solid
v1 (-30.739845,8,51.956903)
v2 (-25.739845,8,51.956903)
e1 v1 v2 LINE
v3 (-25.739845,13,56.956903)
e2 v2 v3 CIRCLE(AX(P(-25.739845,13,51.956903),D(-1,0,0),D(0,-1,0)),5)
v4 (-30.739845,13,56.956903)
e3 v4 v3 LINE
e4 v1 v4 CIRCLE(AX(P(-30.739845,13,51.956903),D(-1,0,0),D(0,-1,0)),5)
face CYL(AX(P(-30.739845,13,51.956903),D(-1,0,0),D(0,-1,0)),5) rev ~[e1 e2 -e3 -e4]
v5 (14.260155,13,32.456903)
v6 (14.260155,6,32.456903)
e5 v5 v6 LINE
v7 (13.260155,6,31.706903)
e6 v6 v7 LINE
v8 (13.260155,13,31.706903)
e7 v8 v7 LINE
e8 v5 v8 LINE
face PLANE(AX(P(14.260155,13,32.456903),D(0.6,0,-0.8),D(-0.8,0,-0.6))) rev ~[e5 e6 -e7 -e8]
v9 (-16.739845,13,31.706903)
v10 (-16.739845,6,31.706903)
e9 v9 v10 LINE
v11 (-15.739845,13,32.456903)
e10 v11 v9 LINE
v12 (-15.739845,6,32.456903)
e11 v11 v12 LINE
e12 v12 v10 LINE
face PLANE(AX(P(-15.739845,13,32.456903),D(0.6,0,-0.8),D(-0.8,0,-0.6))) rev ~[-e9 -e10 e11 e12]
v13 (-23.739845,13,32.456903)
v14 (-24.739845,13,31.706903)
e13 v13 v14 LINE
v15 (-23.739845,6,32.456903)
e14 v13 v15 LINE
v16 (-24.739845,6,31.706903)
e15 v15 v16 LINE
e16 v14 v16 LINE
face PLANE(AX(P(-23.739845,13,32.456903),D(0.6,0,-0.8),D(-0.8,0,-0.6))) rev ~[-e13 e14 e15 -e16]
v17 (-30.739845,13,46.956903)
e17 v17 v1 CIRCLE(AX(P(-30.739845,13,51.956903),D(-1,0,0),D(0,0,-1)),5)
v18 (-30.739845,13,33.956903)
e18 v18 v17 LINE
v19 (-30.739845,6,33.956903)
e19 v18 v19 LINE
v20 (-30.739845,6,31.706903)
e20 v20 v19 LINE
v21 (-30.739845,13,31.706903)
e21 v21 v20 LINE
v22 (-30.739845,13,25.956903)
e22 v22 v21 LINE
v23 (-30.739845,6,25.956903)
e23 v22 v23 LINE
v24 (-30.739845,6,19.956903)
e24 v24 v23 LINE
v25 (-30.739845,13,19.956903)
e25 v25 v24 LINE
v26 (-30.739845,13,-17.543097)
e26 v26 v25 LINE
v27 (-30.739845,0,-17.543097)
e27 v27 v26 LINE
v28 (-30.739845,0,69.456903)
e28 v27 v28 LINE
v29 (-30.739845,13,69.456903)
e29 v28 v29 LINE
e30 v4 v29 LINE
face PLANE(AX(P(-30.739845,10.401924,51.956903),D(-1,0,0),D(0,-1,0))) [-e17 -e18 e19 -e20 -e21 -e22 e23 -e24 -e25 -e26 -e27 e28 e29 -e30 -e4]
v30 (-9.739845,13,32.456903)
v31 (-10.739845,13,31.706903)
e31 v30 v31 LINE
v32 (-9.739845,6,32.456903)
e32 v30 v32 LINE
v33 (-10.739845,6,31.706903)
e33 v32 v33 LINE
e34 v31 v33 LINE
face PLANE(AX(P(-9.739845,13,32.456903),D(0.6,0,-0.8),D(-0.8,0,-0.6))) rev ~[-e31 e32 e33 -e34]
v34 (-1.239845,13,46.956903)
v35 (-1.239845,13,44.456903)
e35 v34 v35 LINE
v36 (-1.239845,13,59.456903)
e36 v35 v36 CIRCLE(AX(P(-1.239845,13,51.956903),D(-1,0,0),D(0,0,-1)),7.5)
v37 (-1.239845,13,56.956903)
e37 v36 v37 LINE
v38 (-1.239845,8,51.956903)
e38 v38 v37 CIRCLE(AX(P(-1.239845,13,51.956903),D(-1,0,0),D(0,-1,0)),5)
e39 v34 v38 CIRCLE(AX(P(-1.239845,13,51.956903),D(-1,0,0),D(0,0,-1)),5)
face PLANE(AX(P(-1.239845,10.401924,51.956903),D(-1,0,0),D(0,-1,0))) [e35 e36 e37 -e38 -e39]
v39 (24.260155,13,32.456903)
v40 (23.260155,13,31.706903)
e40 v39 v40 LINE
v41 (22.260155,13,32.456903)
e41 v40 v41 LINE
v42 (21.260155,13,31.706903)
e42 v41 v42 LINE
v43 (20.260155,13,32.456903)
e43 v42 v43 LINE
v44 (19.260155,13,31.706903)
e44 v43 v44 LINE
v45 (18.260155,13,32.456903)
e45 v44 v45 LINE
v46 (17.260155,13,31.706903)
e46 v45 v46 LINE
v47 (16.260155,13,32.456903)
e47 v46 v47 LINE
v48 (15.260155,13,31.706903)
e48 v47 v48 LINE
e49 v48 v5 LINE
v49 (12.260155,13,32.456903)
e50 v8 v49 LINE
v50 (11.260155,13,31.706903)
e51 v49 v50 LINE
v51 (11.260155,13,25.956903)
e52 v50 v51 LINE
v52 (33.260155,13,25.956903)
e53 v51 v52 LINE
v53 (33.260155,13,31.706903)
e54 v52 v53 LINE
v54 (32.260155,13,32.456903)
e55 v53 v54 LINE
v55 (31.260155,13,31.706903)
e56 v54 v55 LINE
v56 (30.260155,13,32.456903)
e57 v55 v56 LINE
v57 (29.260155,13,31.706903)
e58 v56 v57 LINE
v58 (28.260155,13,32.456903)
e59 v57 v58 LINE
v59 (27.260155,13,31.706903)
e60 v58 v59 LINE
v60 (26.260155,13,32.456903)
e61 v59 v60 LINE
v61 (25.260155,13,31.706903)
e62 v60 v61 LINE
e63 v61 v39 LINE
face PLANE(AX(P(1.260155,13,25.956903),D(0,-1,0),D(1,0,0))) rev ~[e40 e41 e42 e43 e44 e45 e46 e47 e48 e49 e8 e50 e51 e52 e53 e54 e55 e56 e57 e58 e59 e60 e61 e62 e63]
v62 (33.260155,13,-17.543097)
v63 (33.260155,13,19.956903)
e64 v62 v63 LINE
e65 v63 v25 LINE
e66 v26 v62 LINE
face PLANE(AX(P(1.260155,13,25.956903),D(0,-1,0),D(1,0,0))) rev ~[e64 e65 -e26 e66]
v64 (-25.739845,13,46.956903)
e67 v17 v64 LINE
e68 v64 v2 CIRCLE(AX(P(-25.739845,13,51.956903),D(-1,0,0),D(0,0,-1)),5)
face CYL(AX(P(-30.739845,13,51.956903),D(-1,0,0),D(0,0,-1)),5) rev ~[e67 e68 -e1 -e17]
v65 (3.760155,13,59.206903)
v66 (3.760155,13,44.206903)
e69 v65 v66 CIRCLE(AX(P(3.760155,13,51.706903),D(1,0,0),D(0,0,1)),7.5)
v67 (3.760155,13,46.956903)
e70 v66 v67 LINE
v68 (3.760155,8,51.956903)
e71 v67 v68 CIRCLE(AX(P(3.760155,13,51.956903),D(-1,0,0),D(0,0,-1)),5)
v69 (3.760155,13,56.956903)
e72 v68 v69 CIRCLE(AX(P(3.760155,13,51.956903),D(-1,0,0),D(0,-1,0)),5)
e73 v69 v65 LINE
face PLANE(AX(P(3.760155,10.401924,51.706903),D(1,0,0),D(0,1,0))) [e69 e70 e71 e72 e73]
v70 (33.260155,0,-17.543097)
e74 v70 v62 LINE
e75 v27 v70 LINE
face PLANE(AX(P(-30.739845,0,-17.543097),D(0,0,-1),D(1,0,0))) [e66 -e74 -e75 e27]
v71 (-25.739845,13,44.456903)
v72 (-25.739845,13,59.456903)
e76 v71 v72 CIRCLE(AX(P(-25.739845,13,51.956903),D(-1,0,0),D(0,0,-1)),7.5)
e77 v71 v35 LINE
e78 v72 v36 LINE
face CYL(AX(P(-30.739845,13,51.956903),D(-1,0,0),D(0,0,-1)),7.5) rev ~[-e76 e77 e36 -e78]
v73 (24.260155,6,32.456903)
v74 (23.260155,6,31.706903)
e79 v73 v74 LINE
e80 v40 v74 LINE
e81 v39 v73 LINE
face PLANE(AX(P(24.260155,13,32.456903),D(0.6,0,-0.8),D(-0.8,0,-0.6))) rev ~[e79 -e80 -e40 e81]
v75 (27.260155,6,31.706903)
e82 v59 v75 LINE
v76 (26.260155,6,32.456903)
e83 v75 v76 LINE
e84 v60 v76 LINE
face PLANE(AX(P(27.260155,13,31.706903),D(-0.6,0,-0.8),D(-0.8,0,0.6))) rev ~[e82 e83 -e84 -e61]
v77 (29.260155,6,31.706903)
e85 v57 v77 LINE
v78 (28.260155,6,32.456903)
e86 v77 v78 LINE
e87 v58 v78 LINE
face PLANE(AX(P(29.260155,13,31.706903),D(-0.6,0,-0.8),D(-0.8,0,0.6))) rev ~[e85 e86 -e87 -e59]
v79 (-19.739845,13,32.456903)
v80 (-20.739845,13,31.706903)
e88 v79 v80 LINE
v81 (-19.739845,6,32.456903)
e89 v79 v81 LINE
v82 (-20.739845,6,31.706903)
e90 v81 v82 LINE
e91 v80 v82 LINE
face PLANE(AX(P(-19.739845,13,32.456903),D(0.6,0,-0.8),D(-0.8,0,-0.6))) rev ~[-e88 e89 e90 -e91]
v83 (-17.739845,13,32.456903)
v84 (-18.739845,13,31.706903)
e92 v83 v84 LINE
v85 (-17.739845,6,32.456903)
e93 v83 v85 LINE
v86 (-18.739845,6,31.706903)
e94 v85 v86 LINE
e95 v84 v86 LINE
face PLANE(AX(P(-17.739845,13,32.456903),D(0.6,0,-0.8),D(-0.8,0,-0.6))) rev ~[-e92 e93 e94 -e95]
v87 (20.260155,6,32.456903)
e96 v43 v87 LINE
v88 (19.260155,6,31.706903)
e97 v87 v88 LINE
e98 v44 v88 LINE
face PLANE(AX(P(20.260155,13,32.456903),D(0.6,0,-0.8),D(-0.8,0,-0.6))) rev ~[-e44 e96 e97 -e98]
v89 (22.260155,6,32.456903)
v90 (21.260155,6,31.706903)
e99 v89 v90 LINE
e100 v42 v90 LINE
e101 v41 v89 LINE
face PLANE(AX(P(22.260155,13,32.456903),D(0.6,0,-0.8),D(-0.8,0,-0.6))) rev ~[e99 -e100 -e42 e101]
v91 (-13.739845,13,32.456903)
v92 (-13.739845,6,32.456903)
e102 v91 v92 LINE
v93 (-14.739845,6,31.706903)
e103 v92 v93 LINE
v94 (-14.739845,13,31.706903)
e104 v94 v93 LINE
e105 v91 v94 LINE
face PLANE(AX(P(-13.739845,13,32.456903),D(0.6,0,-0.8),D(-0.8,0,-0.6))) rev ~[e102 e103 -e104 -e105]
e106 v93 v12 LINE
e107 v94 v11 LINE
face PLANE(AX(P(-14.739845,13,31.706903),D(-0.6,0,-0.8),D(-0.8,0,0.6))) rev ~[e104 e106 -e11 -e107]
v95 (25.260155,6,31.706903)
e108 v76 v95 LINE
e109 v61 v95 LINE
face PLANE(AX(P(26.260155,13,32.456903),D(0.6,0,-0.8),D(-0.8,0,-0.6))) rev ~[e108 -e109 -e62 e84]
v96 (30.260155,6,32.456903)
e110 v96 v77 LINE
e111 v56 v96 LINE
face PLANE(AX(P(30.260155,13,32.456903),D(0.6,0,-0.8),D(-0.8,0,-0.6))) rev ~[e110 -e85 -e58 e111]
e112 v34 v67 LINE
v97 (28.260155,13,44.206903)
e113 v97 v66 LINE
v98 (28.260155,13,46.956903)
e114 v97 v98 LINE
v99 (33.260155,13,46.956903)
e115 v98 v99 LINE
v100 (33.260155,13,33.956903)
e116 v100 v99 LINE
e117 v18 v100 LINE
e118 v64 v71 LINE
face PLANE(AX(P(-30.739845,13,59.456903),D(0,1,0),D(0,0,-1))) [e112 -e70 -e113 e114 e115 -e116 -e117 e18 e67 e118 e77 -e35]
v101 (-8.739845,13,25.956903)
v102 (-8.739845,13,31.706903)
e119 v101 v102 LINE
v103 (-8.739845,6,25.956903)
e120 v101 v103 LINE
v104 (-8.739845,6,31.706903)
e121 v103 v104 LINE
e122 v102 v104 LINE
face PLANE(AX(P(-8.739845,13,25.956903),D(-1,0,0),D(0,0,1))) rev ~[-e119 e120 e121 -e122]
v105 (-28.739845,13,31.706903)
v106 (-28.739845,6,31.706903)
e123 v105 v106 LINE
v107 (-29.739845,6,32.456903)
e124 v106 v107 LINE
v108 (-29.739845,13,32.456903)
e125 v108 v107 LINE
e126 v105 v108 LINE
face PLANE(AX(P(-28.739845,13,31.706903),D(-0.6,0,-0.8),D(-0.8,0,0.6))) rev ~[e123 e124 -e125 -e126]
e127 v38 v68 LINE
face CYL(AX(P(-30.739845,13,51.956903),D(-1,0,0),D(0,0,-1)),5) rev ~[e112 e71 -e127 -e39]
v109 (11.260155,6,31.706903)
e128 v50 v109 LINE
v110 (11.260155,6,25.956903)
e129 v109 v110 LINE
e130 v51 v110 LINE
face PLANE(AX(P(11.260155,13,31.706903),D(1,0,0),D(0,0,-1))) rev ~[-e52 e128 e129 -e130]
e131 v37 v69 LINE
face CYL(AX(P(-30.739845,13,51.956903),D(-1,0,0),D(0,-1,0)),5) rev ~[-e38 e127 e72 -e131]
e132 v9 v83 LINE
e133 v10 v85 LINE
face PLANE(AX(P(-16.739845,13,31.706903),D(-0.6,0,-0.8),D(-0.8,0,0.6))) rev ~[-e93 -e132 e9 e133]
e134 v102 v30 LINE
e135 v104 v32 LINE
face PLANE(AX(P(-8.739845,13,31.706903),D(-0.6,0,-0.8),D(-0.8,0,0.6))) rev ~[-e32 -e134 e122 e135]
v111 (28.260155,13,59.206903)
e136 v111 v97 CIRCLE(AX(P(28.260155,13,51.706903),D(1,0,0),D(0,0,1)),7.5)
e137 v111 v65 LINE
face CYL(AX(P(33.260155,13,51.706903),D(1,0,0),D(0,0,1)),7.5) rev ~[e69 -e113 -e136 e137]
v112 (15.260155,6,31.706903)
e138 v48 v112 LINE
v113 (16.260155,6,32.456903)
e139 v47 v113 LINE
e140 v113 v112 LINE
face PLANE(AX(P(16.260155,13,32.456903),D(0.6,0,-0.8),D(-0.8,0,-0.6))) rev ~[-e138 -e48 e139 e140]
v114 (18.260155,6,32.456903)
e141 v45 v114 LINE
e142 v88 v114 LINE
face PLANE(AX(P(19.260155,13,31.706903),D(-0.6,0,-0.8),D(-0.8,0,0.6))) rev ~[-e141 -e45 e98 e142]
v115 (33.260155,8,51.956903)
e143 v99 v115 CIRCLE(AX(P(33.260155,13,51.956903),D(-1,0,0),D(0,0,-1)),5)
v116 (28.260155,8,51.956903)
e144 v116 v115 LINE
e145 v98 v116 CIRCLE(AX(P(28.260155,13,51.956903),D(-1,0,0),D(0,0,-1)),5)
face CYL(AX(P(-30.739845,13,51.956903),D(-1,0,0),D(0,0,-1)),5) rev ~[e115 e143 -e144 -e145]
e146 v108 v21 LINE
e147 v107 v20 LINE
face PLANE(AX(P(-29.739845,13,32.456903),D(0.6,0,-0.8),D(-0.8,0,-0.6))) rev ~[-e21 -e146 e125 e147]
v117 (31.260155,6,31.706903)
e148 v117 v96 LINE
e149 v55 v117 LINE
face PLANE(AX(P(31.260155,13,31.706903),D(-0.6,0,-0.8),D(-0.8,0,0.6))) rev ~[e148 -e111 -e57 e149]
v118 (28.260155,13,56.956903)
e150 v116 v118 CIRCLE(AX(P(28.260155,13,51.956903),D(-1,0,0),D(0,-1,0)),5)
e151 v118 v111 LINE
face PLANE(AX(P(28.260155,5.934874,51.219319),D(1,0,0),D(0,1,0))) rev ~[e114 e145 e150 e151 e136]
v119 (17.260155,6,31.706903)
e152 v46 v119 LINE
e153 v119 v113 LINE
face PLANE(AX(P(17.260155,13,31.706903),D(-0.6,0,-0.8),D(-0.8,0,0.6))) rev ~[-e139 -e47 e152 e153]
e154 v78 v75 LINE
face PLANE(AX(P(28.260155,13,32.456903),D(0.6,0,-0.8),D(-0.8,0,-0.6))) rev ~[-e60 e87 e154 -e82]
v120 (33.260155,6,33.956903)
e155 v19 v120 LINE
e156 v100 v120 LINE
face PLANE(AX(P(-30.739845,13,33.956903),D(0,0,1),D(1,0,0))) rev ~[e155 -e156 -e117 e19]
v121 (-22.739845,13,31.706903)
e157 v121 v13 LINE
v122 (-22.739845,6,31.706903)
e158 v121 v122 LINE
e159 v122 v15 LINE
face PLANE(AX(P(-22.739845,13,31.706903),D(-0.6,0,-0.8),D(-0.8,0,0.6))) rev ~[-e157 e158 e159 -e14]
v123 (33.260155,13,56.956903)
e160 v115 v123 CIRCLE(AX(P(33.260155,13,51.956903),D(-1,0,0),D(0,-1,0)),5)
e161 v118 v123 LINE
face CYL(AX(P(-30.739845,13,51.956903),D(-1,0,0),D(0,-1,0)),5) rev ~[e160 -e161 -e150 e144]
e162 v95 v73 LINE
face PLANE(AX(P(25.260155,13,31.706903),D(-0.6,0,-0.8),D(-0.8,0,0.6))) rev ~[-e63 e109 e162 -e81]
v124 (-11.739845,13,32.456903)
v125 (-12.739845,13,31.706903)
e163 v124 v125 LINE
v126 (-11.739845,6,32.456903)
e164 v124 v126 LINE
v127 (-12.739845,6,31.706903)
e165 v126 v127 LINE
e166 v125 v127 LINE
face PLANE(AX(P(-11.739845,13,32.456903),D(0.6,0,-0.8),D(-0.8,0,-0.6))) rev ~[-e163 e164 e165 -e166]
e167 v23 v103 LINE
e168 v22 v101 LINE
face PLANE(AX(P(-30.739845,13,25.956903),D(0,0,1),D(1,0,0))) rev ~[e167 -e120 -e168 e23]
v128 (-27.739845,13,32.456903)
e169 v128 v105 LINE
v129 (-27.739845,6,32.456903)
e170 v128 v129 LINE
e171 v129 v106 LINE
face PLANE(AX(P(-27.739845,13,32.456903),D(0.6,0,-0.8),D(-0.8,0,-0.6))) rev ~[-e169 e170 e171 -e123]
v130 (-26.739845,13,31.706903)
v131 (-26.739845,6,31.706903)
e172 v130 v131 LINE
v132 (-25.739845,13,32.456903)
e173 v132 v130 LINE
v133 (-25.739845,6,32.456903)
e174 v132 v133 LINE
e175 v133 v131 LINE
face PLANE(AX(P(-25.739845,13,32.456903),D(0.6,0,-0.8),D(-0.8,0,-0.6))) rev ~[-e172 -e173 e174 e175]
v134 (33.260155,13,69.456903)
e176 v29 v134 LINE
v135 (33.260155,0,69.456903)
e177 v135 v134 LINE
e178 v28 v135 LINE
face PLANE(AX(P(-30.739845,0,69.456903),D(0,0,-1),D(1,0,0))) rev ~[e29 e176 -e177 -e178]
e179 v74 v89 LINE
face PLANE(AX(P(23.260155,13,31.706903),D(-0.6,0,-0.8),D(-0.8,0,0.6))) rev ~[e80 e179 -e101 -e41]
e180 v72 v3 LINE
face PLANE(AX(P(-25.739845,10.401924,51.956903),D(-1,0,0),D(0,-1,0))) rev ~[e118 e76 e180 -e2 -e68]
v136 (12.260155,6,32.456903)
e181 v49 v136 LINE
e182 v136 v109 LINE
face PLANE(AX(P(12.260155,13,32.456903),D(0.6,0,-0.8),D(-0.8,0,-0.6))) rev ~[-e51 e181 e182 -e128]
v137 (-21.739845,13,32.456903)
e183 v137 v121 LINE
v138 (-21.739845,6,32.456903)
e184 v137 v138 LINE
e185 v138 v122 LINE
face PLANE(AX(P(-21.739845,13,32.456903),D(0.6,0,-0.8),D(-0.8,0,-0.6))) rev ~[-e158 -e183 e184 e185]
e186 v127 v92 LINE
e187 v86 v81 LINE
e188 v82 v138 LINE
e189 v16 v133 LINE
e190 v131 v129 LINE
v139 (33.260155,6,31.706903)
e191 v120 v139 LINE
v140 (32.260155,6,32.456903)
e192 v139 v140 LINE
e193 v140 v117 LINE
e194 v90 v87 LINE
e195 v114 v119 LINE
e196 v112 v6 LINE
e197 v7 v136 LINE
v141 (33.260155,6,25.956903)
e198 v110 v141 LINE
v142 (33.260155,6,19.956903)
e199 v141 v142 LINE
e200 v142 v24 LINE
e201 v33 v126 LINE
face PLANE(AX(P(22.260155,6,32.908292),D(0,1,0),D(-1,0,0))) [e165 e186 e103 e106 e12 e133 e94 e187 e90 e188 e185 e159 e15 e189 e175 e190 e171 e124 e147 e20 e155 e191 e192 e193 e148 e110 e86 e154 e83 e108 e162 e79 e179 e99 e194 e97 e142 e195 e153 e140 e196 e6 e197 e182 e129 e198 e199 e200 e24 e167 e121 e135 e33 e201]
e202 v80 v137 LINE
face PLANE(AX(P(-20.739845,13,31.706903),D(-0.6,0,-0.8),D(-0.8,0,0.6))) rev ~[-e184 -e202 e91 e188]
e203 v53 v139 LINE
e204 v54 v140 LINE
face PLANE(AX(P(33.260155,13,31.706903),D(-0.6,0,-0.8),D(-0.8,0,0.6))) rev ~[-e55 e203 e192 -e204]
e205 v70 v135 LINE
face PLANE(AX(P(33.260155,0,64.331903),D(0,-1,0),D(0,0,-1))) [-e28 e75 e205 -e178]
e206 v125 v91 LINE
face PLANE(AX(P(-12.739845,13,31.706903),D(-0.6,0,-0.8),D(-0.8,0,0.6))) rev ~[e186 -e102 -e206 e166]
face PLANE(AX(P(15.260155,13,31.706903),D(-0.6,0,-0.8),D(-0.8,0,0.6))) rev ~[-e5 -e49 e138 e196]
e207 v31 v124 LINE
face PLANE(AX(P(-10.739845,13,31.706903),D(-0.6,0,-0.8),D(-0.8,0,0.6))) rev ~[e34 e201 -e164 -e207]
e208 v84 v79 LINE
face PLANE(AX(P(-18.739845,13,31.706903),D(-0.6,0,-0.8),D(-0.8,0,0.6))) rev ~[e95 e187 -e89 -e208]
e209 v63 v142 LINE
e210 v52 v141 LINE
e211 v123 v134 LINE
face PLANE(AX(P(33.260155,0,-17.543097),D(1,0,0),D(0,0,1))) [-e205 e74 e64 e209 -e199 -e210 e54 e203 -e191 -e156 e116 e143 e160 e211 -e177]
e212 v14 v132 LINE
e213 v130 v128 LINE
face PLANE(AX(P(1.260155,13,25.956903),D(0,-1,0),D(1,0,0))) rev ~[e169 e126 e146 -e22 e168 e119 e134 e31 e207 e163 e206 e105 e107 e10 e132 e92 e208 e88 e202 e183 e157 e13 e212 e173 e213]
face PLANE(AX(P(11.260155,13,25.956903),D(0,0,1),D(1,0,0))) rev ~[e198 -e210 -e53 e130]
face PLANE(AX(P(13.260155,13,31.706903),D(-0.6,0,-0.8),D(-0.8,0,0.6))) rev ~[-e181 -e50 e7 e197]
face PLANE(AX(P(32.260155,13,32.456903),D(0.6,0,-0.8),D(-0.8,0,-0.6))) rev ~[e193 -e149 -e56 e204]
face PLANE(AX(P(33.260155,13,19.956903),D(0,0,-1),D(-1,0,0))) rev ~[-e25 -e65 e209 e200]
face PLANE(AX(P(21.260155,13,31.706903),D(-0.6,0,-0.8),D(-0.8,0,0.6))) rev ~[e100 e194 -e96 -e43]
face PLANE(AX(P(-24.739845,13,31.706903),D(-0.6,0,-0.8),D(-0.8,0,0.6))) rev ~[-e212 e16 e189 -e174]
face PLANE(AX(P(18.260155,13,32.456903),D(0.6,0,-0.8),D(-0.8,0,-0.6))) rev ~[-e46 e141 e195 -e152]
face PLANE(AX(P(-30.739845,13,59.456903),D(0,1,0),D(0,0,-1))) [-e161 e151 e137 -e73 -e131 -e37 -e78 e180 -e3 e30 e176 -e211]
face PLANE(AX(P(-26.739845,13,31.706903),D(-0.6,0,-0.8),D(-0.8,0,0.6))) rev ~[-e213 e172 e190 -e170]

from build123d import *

# Parameters (mm, degrees)
F0_W      = 64
F0_H      = 87
F1_DEPTH  = 13
F3_DEPTH  = 7
F5_DEPTH  = 29.5
F7_DEPTH  = 29.5
F9_DEPTH  = 5
F10_DEPTH = 5
F12_DEPTH = 64.001


with BuildPart() as f1:
    # F0 (on Front) → F1 (new body)
    with BuildSketch(Plane.XZ):
        with Locations((1.2601554287, 25.9569030584)):
            Rectangle(F0_W, F0_H)
    extrude(amount=-F1_DEPTH)

    # F2 (on face) → F3 (cut)
    with BuildSketch(Plane(origin=(0, 13, 0), x_dir=(-1, 0, 0), z_dir=(0, 1, 0))):
        Polygon((-11.2601554287, 33.9569030584), (-33.2601554287, 33.9569030584), (-33.2601554287, 31.7069030584), (-32.2601554287, 32.4569030584), (-31.2601554287, 31.7069030584), (-30.2601554287, 32.4569030584), (-29.2601554287, 31.7069030584), (-28.2601554287, 32.4569030584), (-27.2601554287, 31.7069030584), (-26.2601554287, 32.4569030584), (-25.2601554287, 31.7069030584), (-24.2601554287, 32.4569030584), (-23.2601554287, 31.7069030584), (-22.2601554287, 32.4569030584), (-21.2601554287, 31.7069030584), (-20.2601554287, 32.4569030584), (-19.2601554287, 31.7069030584), (-18.2601554287, 32.4569030584), (-17.2601554287, 31.7069030584), (-16.2601554287, 32.4569030584), (-15.2601554287, 31.7069030584), (-14.2601554287, 32.4569030584), (-13.2601554287, 31.7069030584), (-12.2601554287, 32.4569030584), (-11.2601554287, 31.7069030584), align=None)
        Polygon((8.7398445713, 33.9569030584), (-11.2601554287, 33.9569030584), (-11.2601554287, 31.7069030584), (-10.2601554287, 32.4569030584), (-9.2601554287, 31.7069030584), (-8.2601554287, 32.4569030584), (-7.2601554287, 31.7069030584), (-6.2601554287, 32.4569030584), (-5.2601554287, 31.7069030584), (-4.2601554287, 32.4569030584), (-3.2601554287, 31.7069030584), (-2.2601554287, 32.4569030584), (-1.2601554287, 31.7069030584), (-0.2601554287, 32.4569030584), (0.7398445713, 31.7069030584), (1.7398445713, 32.4569030584), (2.7398445713, 31.7069030584), (3.7398445713, 32.4569030584), (4.7398445713, 31.7069030584), (5.7398445713, 32.4569030584), (6.7398445713, 31.7069030584), (7.7398445713, 32.4569030584), (8.7398445713, 31.7069030584), align=None)
        Polygon((-9.2601554287, 31.7069030584), (-11.2601554287, 31.7069030584), (-11.2601554287, 25.9569030584), (8.7398445713, 25.9569030584), (8.7398445713, 31.7069030584), (6.7398445713, 31.7069030584), (4.7398445713, 31.7069030584), (2.7398445713, 31.7069030584), (0.7398445713, 31.7069030584), (-1.2601554287, 31.7069030584), (-3.2601554287, 31.7069030584), (-5.2601554287, 31.7069030584), (-7.2601554287, 31.7069030584), align=None)
        Polygon((30.7398445713, 33.9569030584), (8.7398445713, 33.9569030584), (8.7398445713, 31.7069030584), (9.7398445713, 32.4569030584), (10.7398445713, 31.7069030584), (11.7398445713, 32.4569030584), (12.7398445713, 31.7069030584), (13.7398445713, 32.4569030584), (14.7398445713, 31.7069030584), (15.7398445713, 32.4569030584), (16.7398445713, 31.7069030584), (17.7398445713, 32.4569030584), (18.7398445713, 31.7069030584), (19.7398445713, 32.4569030584), (20.7398445713, 31.7069030584), (21.7398445713, 32.4569030584), (22.7398445713, 31.7069030584), (23.7398445713, 32.4569030584), (24.7398445713, 31.7069030584), (25.7398445713, 32.4569030584), (26.7398445713, 31.7069030584), (27.7398445713, 32.4569030584), (28.7398445713, 31.7069030584), (29.7398445713, 32.4569030584), (30.7398445713, 31.7069030584), align=None)
        Polygon((-11.2601554287, 25.9569030584), (-33.2601554287, 25.9569030584), (-33.2601554287, 19.9569030584), (30.7398445713, 19.9569030584), (30.7398445713, 25.9569030584), (8.7398445713, 25.9569030584), align=None)
        Polygon((6.7398445713, 31.7069030584), (8.7398445713, 31.7069030584), (7.7398445713, 32.4569030584), align=None)
        Polygon((4.7398445713, 31.7069030584), (6.7398445713, 31.7069030584), (5.7398445713, 32.4569030584), align=None)
        Polygon((2.7398445713, 31.7069030584), (4.7398445713, 31.7069030584), (3.7398445713, 32.4569030584), align=None)
        Polygon((0.7398445713, 31.7069030584), (2.7398445713, 31.7069030584), (1.7398445713, 32.4569030584), align=None)
        Polygon((-1.2601554287, 31.7069030584), (0.7398445713, 31.7069030584), (-0.2601554287, 32.4569030584), align=None)
        Polygon((-2.2601554287, 32.4569030584), (-3.2601554287, 31.7069030584), (-1.2601554287, 31.7069030584), align=None)
        Polygon((-6.2601554287, 32.4569030584), (-7.2601554287, 31.7069030584), (-5.2601554287, 31.7069030584), align=None)
        Polygon((-4.2601554287, 32.4569030584), (-5.2601554287, 31.7069030584), (-3.2601554287, 31.7069030584), align=None)
        Polygon((-8.2601554287, 32.4569030584), (-9.2601554287, 31.7069030584), (-7.2601554287, 31.7069030584), align=None)
        Polygon((-10.2601554287, 32.4569030584), (-11.2601554287, 31.7069030584), (-9.2601554287, 31.7069030584), align=None)
    extrude(amount=-F3_DEPTH, mode=Mode.SUBTRACT)

    # F4 (on face) → F5 (cut, through all)
    with BuildSketch(Plane(origin=(-30.7398445713, 0, 0), x_dir=(0, -1, 0), z_dir=(-1, 0, 0))):
        with BuildLine():
            ThreePointArc((-13, 44.4569030584), (-7.6966991411, 46.6536021995), (-5.5, 51.9569030584))
            ThreePointArc((-5.5, 51.9569030584), (-7.6966991411, 57.2602039173), (-13, 59.4569030584))
            Line((-13, 59.4569030584), (-13, 44.4569030584))
        make_face()
    extrude(amount=-F5_DEPTH, mode=Mode.SUBTRACT)

    # F6 (on face) → F7 (cut, through all)
    with BuildSketch(Plane.YZ.offset(33.2601554287)):
        with BuildLine():
            Line((13, 44.2069030584), (13, 59.2069030584))
            ThreePointArc((13, 59.2069030584), (5.5, 51.7069030584), (13, 44.2069030584))
        make_face()
    extrude(amount=-F7_DEPTH, mode=Mode.SUBTRACT)

    # F8 (on face) → F9 (join)
    with BuildSketch(Plane.YZ.offset(33.2601554287)):
        with BuildLine():
            Line((13, 59.2069030584), (13, 64.3319030584))
            Line((13, 64.3319030584), (0, 64.3319030584))
            Line((0, 64.3319030584), (0, 38.0137264729))
            Line((0, 38.0137264729), (13, 38.0137264729))
            Line((13, 38.0137264729), (13, 44.2069030584))
            ThreePointArc((13, 44.2069030584), (5.5, 51.7069030584), (13, 59.2069030584))
        make_face()
        with BuildLine():
            Line((13, 44.2069030584), (13, 59.2069030584))
            ThreePointArc((13, 59.2069030584), (5.5, 51.7069030584), (13, 44.2069030584))
        make_face()
    extrude(amount=-F9_DEPTH)

    # F4 (on face) → F10 (join)
    with BuildSketch(Plane(origin=(-30.7398445713, 0, 0), x_dir=(0, -1, 0), z_dir=(-1, 0, 0))):
        with BuildLine():
            ThreePointArc((-13, 44.4569030584), (-7.6966991411, 46.6536021995), (-5.5, 51.9569030584))
            ThreePointArc((-5.5, 51.9569030584), (-7.6966991411, 57.2602039173), (-13, 59.4569030584))
            Line((-13, 59.4569030584), (-13, 44.4569030584))
        make_face()
    extrude(amount=-F10_DEPTH)

    # F11 (on face) → F12 (cut, through all)
    with BuildSketch(Plane(origin=(-30.7398445713, 0, 0), x_dir=(0, -1, 0), z_dir=(-1, 0, 0))):
        with BuildLine():
            ThreePointArc((-13, 46.9569030584), (-9.4644660941, 48.4213691524), (-8, 51.9569030584))
            ThreePointArc((-8, 51.9569030584), (-9.4644660941, 55.4924369643), (-13, 56.9569030584))
            Line((-13, 56.9569030584), (-13, 46.9569030584))
        make_face()
    extrude(amount=-F12_DEPTH, mode=Mode.SUBTRACT)


solid = f1.part
